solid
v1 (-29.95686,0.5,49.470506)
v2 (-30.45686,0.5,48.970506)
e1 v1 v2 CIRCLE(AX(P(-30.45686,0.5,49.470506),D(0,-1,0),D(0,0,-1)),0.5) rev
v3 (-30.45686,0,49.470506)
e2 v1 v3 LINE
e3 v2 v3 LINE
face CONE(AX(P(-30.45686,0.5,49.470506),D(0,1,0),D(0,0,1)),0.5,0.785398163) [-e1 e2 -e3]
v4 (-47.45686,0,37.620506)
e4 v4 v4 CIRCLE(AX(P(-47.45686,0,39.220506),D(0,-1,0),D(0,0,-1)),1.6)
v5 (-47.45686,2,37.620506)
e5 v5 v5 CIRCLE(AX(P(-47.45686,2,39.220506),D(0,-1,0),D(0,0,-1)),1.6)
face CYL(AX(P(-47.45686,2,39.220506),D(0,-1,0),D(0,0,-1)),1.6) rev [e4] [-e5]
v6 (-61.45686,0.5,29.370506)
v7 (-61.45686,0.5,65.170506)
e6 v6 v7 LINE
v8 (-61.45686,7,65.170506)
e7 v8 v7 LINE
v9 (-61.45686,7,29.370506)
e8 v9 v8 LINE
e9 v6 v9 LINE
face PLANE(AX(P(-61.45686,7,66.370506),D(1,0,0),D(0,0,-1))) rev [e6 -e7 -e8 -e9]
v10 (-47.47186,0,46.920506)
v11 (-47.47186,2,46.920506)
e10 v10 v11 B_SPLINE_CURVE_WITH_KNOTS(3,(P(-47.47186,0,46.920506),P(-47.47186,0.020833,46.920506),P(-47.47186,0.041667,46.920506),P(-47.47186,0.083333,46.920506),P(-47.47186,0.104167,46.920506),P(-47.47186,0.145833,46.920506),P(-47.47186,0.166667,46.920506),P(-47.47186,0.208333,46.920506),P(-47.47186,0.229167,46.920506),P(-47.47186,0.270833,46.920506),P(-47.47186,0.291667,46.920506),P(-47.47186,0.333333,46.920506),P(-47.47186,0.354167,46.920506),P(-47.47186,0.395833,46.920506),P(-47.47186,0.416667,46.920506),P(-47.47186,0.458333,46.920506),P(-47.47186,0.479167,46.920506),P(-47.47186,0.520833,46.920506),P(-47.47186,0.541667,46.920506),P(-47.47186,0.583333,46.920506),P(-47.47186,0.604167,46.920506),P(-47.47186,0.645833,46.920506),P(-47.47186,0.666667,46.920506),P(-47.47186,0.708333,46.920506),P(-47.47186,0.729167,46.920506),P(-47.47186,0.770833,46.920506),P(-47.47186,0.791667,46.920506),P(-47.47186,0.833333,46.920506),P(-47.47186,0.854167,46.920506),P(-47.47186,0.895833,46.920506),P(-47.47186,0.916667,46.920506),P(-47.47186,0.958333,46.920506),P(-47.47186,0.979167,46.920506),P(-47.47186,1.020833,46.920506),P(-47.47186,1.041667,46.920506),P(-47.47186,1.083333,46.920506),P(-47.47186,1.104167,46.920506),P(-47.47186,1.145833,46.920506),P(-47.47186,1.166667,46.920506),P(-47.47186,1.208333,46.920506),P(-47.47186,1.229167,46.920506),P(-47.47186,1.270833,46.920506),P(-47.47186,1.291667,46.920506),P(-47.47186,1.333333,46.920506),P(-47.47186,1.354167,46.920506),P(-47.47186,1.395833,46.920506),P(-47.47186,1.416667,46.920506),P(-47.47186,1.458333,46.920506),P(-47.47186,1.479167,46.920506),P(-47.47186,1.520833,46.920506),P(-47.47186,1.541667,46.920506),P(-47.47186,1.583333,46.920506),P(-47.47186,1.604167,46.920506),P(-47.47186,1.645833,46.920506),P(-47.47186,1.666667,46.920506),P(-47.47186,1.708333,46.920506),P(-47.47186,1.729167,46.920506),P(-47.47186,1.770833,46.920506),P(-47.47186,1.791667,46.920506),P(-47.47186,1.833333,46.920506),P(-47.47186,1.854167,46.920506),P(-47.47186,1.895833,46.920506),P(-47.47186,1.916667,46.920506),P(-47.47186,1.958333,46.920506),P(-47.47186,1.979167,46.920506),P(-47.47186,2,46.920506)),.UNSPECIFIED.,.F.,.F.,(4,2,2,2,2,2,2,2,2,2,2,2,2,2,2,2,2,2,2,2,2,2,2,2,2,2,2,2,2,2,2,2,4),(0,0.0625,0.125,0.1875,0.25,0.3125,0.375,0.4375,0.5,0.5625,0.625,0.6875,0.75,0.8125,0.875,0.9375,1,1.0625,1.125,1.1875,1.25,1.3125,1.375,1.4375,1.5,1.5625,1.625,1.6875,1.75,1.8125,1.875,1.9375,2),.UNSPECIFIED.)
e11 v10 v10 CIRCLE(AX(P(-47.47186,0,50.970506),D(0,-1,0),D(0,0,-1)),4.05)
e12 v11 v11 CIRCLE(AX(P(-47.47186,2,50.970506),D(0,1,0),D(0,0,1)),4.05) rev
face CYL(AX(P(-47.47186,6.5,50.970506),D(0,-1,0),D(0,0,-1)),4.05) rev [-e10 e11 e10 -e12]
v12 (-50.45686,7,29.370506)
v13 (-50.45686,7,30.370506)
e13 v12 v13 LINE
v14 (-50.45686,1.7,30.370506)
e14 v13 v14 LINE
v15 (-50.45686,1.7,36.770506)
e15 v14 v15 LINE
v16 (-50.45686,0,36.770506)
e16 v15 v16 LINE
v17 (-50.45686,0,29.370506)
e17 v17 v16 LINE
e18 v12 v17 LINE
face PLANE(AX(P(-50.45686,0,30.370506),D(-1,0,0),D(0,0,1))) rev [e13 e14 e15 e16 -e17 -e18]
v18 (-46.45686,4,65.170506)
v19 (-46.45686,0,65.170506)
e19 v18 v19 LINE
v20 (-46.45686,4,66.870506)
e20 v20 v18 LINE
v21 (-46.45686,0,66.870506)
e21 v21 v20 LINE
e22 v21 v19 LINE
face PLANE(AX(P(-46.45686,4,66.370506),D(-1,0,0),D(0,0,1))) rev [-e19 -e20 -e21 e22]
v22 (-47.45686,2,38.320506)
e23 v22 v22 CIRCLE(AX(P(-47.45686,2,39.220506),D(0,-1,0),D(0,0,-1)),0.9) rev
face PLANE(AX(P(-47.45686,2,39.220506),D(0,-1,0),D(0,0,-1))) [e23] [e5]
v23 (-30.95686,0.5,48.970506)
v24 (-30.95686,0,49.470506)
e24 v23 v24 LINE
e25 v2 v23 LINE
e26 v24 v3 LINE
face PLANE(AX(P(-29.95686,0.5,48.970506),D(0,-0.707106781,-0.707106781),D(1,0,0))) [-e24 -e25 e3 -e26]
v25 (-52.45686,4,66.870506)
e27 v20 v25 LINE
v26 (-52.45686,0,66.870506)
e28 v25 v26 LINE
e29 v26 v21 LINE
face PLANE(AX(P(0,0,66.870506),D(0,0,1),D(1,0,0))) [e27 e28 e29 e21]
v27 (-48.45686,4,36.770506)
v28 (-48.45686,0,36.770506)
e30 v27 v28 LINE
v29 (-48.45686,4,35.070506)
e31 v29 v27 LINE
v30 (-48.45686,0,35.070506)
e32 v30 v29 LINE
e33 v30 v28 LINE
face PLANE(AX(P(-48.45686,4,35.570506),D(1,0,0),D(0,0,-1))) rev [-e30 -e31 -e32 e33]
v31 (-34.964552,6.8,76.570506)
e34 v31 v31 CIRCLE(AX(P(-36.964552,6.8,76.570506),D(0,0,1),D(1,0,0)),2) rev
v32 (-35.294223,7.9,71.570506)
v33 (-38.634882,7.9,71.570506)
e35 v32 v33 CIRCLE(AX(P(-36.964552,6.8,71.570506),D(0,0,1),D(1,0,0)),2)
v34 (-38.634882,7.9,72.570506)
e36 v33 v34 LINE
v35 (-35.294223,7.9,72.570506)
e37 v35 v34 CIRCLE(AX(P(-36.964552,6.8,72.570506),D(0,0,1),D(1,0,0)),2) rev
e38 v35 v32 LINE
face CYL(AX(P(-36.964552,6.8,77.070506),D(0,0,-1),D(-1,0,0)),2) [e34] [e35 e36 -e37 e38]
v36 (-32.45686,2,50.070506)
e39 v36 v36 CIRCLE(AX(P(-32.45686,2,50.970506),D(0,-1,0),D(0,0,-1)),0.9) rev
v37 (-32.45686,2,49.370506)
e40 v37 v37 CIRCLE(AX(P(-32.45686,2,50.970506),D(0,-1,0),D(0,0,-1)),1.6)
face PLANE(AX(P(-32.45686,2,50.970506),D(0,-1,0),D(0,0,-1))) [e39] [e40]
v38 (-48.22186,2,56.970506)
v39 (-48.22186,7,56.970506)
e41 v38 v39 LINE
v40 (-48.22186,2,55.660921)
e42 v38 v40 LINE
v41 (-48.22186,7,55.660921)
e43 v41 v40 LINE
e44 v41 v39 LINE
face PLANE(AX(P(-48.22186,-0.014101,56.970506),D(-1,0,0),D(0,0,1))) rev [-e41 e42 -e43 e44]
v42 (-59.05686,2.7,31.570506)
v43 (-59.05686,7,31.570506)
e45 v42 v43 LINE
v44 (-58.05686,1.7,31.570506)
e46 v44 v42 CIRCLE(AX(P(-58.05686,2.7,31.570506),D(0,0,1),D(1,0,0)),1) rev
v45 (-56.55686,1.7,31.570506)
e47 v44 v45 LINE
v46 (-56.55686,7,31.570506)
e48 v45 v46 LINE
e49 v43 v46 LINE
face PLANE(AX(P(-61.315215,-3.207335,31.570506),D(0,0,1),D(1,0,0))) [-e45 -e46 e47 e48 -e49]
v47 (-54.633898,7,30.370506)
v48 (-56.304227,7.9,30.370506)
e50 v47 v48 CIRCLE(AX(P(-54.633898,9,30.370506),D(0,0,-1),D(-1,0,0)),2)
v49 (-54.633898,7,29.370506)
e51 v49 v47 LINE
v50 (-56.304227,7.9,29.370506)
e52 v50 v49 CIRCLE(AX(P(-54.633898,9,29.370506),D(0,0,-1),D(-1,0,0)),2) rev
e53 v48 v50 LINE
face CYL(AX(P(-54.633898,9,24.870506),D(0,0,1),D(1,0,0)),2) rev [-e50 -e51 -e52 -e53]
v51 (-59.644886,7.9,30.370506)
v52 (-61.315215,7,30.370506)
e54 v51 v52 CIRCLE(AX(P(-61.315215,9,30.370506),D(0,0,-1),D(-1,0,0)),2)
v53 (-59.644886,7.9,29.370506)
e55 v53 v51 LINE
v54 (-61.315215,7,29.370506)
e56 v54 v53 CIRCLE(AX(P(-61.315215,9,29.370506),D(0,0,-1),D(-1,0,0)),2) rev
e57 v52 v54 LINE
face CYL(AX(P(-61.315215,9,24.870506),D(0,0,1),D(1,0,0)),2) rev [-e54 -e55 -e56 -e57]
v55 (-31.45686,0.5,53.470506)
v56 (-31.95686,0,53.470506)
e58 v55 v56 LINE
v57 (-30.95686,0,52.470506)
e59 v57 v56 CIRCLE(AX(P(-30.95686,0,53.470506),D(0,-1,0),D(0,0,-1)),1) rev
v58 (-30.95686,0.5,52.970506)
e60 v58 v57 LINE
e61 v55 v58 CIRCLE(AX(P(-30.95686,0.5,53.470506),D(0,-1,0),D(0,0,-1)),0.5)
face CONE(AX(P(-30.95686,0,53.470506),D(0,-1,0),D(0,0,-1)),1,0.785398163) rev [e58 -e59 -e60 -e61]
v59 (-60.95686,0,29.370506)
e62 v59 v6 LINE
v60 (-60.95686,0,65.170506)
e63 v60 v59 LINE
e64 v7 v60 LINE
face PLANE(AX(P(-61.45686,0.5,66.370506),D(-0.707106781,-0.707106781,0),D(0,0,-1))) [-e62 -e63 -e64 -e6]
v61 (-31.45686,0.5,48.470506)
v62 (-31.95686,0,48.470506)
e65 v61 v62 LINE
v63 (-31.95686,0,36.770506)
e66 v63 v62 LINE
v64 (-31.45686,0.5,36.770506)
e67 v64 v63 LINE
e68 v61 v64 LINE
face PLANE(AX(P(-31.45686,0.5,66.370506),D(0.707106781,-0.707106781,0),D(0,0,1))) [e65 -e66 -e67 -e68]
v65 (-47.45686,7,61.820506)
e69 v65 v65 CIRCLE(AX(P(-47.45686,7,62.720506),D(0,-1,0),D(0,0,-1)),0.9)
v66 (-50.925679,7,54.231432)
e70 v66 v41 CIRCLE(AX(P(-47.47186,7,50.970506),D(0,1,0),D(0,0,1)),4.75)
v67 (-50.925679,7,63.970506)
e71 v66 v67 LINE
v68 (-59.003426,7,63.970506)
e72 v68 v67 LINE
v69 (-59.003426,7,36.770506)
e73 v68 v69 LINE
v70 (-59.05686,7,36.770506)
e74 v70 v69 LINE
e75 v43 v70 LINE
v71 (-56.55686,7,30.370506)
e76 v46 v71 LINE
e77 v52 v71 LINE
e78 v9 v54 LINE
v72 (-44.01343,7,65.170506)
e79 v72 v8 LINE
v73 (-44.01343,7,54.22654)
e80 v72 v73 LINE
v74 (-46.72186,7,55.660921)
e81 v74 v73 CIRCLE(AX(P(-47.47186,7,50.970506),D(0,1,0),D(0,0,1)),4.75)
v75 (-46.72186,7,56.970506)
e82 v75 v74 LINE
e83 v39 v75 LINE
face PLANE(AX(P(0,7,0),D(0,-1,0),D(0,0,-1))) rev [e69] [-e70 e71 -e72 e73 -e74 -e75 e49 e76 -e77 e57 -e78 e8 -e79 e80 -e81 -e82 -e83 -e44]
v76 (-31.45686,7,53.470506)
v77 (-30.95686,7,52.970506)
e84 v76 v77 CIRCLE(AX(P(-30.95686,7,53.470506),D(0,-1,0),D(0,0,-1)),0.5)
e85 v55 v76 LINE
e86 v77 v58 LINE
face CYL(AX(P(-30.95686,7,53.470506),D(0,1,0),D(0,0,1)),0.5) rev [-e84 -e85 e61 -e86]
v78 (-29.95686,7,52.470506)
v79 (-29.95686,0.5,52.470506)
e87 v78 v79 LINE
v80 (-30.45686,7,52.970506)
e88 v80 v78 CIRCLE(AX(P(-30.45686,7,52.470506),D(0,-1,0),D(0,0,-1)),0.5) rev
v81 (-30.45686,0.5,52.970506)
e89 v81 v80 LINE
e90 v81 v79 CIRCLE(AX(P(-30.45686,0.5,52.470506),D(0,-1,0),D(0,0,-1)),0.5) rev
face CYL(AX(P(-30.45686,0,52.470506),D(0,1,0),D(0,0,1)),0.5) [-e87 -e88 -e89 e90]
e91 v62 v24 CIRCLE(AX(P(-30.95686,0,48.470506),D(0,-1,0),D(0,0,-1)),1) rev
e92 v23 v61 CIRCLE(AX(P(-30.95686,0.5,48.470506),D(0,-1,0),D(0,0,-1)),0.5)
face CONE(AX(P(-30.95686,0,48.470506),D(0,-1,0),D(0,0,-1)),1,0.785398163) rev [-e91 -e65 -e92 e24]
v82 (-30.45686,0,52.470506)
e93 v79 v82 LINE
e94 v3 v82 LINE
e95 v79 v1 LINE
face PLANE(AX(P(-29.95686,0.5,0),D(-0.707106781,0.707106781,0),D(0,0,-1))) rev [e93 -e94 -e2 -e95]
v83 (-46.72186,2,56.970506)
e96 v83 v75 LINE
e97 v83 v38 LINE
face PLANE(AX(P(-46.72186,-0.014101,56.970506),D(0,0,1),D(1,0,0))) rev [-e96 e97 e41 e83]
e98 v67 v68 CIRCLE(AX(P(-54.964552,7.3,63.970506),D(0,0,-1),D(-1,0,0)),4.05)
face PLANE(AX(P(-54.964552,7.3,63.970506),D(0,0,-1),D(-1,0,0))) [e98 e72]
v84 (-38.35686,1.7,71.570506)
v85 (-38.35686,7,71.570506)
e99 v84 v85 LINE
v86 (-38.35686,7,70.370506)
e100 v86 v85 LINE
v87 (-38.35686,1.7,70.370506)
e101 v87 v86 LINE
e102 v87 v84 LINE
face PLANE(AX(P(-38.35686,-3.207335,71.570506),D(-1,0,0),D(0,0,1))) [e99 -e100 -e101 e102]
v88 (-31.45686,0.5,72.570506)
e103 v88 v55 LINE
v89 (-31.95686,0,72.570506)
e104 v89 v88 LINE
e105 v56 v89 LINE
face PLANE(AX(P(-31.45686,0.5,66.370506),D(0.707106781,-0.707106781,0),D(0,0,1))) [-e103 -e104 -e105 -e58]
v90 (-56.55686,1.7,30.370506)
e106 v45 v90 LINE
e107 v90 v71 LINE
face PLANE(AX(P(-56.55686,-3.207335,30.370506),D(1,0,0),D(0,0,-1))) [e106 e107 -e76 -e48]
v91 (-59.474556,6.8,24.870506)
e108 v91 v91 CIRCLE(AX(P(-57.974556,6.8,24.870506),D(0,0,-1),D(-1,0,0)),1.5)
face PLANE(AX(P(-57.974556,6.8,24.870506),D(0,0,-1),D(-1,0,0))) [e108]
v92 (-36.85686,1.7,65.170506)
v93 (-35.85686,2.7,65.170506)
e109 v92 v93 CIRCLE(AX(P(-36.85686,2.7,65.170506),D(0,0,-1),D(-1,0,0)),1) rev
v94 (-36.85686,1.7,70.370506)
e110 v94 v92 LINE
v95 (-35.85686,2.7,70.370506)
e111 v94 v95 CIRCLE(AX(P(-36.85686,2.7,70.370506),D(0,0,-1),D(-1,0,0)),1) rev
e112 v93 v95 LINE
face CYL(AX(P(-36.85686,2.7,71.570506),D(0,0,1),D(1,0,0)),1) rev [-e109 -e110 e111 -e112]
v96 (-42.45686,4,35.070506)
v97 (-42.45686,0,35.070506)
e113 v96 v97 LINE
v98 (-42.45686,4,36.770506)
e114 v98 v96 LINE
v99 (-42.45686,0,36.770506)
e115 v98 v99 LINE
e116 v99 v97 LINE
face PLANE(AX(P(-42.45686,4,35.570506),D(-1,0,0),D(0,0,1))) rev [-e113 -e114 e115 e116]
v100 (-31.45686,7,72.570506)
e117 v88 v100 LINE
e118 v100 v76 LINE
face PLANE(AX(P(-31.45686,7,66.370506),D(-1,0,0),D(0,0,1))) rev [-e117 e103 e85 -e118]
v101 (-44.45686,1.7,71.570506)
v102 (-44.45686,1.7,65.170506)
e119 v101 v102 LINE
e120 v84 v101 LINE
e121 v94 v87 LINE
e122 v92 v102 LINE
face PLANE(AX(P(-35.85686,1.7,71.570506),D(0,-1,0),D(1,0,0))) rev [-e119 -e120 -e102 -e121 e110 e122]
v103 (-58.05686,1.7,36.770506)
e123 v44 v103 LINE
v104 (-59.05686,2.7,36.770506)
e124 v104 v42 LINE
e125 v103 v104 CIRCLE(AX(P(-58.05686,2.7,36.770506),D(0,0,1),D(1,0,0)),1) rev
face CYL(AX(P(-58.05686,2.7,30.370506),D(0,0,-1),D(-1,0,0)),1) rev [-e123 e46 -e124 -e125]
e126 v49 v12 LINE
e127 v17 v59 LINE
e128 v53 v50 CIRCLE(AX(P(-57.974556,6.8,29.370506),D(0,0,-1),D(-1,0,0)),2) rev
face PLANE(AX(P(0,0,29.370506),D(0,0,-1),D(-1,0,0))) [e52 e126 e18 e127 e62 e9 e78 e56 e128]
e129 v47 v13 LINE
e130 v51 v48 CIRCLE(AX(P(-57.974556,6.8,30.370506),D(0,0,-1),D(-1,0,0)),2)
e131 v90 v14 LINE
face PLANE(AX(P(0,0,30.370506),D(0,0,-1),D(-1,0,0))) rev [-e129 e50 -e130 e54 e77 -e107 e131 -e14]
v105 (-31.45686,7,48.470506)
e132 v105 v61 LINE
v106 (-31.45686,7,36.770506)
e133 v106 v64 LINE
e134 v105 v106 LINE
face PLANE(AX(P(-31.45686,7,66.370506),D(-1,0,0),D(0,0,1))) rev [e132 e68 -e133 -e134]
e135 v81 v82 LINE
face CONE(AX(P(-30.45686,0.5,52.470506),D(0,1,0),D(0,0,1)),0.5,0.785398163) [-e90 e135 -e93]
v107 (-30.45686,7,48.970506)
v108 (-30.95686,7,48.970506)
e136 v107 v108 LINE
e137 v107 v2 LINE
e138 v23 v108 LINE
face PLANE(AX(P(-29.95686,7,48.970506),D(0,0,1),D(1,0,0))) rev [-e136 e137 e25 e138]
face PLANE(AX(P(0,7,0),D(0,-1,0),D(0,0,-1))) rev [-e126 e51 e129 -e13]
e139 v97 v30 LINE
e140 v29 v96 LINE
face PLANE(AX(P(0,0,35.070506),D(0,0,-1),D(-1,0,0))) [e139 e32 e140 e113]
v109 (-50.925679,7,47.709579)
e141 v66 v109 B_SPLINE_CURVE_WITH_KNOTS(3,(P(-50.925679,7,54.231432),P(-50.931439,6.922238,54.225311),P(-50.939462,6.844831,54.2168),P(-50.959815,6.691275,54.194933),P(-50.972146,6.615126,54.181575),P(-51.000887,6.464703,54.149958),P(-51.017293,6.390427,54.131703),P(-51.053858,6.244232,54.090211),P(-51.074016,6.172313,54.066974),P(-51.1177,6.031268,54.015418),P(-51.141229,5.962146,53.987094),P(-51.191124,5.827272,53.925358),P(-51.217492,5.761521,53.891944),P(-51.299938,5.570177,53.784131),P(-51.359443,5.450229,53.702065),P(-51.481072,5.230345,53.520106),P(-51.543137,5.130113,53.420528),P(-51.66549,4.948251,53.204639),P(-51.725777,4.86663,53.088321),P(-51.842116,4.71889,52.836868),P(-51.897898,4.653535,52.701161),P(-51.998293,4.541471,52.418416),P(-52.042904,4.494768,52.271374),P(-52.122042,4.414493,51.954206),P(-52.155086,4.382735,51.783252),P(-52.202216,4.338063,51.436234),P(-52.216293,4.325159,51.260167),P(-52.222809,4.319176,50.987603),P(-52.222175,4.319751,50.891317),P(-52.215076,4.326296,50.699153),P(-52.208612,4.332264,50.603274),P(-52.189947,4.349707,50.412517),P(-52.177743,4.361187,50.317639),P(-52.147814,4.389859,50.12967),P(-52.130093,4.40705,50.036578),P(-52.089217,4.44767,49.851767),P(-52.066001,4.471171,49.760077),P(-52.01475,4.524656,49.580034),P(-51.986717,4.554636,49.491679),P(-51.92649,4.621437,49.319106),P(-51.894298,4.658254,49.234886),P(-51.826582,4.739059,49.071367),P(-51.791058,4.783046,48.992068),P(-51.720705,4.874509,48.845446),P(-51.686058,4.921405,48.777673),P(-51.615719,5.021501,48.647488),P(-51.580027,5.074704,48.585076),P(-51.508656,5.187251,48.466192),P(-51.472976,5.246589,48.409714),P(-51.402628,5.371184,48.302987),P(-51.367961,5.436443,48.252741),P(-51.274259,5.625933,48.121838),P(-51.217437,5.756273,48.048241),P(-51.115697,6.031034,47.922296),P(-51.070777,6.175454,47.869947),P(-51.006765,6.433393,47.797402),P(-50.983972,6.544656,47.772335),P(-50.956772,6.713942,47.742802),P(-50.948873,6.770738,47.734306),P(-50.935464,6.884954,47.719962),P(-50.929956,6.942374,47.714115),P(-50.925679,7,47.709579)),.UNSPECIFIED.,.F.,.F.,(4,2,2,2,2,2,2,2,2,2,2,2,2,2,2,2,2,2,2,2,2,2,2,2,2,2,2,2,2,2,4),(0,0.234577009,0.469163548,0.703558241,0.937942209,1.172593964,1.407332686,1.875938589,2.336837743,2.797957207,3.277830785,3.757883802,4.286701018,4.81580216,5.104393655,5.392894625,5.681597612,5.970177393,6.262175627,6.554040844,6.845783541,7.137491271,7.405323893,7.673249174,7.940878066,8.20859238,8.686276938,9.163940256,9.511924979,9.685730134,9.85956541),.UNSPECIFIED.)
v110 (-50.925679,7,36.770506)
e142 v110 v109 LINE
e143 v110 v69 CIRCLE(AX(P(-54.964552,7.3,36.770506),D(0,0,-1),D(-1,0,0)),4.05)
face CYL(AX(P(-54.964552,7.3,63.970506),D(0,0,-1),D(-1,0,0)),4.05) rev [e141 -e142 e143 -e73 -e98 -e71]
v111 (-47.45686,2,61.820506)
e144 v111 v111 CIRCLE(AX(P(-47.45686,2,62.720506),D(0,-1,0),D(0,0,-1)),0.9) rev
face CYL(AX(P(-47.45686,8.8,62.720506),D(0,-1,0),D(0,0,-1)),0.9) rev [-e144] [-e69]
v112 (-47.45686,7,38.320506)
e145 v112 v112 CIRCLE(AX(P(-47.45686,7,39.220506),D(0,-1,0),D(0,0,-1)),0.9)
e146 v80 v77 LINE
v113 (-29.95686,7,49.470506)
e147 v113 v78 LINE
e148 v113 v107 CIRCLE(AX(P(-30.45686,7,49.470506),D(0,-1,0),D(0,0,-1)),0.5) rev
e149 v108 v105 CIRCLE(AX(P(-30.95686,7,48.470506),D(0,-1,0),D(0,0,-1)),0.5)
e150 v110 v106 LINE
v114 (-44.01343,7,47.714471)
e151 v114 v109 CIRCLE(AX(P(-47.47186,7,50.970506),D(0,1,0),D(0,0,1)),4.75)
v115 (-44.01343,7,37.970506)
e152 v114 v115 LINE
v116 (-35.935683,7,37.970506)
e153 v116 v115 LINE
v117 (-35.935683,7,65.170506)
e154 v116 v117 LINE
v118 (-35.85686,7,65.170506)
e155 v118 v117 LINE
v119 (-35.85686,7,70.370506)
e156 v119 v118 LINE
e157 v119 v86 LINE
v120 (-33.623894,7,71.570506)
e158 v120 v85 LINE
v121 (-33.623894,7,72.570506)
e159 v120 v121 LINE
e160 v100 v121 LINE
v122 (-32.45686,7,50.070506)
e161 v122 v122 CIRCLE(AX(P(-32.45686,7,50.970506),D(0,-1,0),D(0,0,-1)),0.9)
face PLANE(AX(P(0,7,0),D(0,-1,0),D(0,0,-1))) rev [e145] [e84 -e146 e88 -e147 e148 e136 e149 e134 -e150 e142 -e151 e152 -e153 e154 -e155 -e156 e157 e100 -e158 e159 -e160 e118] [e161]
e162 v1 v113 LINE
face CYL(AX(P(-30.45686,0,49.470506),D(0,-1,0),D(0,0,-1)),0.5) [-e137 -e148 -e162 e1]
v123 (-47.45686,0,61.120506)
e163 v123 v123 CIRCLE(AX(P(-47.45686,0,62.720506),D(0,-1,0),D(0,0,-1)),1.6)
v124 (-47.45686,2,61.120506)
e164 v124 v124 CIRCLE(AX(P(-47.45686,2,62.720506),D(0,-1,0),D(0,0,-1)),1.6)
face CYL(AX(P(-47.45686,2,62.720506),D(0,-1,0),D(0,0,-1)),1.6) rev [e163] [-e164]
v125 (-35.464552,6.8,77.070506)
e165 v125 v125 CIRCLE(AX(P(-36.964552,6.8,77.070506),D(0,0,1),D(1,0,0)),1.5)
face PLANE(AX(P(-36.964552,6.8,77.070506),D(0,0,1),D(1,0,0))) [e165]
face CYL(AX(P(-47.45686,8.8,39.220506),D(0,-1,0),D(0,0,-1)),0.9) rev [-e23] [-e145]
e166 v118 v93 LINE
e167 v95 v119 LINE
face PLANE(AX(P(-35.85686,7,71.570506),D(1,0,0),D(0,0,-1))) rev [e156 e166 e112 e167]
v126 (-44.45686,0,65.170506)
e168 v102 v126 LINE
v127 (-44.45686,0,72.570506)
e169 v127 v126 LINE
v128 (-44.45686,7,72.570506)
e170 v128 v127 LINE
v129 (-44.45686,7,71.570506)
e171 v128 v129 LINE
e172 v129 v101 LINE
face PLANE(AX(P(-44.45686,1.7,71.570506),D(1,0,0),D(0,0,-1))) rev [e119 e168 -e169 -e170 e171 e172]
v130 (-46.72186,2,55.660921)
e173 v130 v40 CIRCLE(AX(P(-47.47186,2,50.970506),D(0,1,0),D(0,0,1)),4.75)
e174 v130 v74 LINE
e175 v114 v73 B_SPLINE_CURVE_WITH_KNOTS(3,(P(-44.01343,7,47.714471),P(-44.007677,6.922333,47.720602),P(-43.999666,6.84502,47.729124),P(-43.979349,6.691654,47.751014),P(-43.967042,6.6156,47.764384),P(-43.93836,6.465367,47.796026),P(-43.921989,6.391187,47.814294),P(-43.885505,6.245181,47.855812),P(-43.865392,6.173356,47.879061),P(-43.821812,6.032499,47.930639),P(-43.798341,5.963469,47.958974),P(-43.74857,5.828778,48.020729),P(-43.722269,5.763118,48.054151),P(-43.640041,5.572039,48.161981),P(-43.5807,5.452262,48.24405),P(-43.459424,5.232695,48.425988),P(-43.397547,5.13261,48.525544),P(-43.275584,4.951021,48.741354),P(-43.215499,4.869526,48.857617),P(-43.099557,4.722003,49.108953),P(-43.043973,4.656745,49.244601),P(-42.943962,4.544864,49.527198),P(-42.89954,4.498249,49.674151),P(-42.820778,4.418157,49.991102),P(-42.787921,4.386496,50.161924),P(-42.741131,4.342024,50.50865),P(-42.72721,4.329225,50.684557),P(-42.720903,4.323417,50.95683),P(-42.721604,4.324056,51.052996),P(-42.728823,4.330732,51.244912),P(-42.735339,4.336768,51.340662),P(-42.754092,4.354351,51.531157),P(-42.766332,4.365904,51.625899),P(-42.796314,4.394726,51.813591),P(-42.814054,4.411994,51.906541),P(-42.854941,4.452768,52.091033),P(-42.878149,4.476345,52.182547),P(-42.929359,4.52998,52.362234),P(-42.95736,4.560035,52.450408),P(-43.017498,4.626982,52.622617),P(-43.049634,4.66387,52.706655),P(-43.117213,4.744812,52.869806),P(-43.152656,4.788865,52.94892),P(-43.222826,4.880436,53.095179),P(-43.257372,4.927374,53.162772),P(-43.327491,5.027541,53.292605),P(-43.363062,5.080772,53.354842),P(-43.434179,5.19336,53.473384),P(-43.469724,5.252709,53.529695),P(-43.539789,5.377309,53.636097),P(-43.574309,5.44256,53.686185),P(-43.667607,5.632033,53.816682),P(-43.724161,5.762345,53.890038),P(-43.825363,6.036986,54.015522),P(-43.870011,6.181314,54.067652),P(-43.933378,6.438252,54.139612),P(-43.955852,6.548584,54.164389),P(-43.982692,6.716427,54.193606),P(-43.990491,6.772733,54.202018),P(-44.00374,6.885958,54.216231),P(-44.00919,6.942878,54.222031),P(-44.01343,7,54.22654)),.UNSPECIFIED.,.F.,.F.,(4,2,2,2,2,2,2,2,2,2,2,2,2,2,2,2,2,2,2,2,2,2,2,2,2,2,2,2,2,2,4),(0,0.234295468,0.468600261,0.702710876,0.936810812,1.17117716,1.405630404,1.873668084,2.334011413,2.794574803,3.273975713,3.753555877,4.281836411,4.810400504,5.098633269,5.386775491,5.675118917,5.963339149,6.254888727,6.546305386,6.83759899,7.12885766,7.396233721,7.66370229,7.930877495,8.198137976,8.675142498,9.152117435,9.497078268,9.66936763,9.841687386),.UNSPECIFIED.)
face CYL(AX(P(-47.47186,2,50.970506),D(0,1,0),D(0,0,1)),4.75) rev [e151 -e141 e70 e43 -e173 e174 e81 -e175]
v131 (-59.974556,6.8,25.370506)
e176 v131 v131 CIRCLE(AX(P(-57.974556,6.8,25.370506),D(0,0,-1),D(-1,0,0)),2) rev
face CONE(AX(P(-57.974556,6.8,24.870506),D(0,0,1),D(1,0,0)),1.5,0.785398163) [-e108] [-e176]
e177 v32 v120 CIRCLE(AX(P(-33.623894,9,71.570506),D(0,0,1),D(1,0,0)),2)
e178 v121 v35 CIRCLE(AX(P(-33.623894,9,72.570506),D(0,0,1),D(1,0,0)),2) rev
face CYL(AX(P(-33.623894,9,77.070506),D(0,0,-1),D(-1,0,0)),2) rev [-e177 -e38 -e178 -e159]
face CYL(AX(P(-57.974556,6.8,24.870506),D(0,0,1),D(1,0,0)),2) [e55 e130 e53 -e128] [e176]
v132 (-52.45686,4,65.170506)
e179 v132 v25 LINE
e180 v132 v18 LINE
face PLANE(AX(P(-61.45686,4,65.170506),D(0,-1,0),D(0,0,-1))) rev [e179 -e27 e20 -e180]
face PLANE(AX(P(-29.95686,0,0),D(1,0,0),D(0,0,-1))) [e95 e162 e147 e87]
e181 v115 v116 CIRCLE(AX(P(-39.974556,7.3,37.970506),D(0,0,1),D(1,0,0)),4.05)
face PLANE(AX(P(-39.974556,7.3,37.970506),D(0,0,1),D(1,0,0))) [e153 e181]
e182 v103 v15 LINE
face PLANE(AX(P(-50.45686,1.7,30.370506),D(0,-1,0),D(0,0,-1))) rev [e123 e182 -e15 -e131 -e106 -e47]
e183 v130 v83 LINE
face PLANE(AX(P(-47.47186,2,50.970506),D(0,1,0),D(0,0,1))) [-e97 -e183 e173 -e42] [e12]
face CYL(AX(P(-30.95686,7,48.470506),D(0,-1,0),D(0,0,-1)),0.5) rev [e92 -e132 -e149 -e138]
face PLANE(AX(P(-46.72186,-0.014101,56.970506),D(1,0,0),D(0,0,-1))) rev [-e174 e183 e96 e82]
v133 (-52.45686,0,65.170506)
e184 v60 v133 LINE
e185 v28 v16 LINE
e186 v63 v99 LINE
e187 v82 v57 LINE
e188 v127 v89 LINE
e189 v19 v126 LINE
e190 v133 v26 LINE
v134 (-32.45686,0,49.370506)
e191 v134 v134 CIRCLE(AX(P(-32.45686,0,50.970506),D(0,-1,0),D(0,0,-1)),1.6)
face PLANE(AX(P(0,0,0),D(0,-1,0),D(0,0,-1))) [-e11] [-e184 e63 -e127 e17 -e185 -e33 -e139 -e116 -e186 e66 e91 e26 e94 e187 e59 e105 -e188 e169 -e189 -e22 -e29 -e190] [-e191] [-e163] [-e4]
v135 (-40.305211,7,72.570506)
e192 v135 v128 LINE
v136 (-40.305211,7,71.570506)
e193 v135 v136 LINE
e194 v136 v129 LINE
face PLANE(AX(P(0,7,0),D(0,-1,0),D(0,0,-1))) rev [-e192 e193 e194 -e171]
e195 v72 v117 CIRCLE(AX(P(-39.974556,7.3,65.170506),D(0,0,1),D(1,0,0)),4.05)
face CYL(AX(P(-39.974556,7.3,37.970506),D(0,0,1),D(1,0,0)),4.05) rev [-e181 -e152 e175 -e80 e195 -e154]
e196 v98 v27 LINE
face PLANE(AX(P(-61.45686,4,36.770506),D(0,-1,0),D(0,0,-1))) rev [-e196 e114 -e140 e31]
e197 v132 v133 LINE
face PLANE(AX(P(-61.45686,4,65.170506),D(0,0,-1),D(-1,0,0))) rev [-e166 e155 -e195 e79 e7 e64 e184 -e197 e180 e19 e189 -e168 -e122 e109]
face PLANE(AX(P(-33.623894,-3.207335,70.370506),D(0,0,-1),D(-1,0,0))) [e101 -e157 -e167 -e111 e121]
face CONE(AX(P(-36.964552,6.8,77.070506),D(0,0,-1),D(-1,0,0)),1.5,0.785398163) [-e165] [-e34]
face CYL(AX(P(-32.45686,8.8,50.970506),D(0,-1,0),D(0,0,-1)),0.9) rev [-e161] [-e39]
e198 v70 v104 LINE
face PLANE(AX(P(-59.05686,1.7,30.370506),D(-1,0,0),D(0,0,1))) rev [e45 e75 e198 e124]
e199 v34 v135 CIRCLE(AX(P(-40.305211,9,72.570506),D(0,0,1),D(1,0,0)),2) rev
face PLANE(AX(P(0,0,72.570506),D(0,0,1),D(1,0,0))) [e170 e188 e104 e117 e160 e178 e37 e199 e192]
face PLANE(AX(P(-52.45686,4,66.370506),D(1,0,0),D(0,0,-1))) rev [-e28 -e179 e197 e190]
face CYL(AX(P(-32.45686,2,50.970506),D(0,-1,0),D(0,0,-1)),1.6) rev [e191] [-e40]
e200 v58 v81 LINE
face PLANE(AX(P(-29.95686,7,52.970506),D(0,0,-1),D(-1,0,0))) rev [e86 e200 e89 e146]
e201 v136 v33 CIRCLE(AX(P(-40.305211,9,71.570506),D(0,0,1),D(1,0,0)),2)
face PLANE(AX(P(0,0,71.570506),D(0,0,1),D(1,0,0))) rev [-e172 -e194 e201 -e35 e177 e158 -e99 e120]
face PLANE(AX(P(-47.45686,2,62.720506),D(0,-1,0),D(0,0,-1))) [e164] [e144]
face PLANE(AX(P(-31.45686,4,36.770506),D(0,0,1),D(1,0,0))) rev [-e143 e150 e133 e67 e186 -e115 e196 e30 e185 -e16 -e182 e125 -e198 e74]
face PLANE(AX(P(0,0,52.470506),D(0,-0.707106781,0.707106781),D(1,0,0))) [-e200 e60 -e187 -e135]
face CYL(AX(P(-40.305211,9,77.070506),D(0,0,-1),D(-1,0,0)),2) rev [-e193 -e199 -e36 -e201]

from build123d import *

# Parameters (mm, degrees)
SKETCH1_W            = 30
SKETCH1_H            = 30.8
BOSS_EXTRUDE1_DEPTH  = 7
SKETCH2_R            = 4.05
CUT_EXTRUDE1_DEPTH   = 6.5
SKETCH3_W            = 15
SKETCH3_H            = 1.2
SKETCH3_W_2          = 9
SKETCH3_W_3          = 11
SKETCH3_W_4          = 13
CUT_EXTRUDE2_DEPTH   = 4
SKETCH4_W            = 30
SKETCH4_H            = 3
CUT_EXTRUDE3_DEPTH   = 1.2
SKETCH5_W            = 30
SKETCH5_H            = 3
CUT_EXTRUDE4_DEPTH   = 1.2
SKETCH6_R            = 4.05
CUT_EXTRUDE5_DEPTH   = 27.2
SKETCH7_R            = 4.05
CUT_EXTRUDE6_DEPTH   = 27.2
SKETCH8_R            = 4.75
CUT_EXTRUDE7_DEPTH   = 5
BOSS_EXTRUDE2_DEPTH  = 6.4
FILLET1_R            = 1
BOSS_EXTRUDE3_DEPTH  = 6.4
FILLET2_R            = 1
SKETCH12_W           = 1.5
SKETCH12_H           = 1.344099237
CUT_EXTRUDE8_DEPTH   = 5
SKETCH13_W           = 13
SKETCH13_H           = 7
BOSS_EXTRUDE4_DEPTH  = 1
SKETCH14_W           = 11
SKETCH14_H           = 7
BOSS_EXTRUDE5_DEPTH  = 1
SKETCH15_R           = 2
BOSS_EXTRUDE8_DEPTH  = 5.5
SKETCH16_R           = 2
BOSS_EXTRUDE9_DEPTH  = 5.5
FILLET3_R            = 2
FILLET4_R            = 2
FILLET5_R            = 2
CHAMFER2_SIZE        = 0.5
CHAMFER3_SIZE        = 0.5
SKETCH17_W           = 4
SKETCH17_H           = 7
BOSS_EXTRUDE10_DEPTH = 1.5
FILLET7_R            = 0.5
SKETCH18_R           = 0.9
CUT_EXTRUDE9_DEPTH   = 99.965895754
SKETCH19_R           = 1.6
CUT_EXTRUDE10_DEPTH  = 2
SKETCH20_R           = 0.9
CUT_EXTRUDE11_DEPTH  = 99.965895754
SKETCH21_R           = 1.6
CUT_EXTRUDE12_DEPTH  = 2
CHAMFER6_SIZE        = 0.5
SKETCH22_W           = 6
SKETCH22_H           = 4
BOSS_EXTRUDE11_DEPTH = 0.5
SKETCH23_W           = 6
SKETCH23_H           = 4
BOSS_EXTRUDE12_DEPTH = 0.5
BOSS_EXTRUDE13_REACH = 100.822
SKETCH24_W           = 4.732966807
SKETCH24_H           = 1.2
SKETCH24_W_2         = 4.75835454


# Some blends are built 0.0001 mm under size
with BuildPart() as part:
    # Sketch1 → Boss-Extrude1 (new body)
    with BuildSketch(Plane(origin=(0, 0, 0), x_dir=(1, 0, 0), z_dir=(0, 1, 0))):
        with Locations((-46.45686042, -50.970505576)):
            Rectangle(SKETCH1_W, SKETCH1_H)
    extrude(amount=BOSS_EXTRUDE1_DEPTH)

    # Sketch2 → Cut-Extrude1 (cut)
    with BuildSketch(Plane.XZ):
        with Locations(Location((-47.47186042, 50.970505576, 0), (0, 0, 270))):
            Circle(SKETCH2_R)
    extrude(amount=-CUT_EXTRUDE1_DEPTH, mode=Mode.SUBTRACT)

    # Sketch3 → Cut-Extrude2 (cut)
    with BuildSketch(Plane.XZ):
        with Locations((-38.95686042, 65.770505576)):
            Rectangle(SKETCH3_W, SKETCH3_H)
        with Locations((-56.95686042, 65.770505576)):
            Rectangle(SKETCH3_W_2, SKETCH3_H)
        with Locations((-36.95686042, 36.170505576)):
            Rectangle(SKETCH3_W_3, SKETCH3_H)
        with Locations((-54.95686042, 36.170505576)):
            Rectangle(SKETCH3_W_4, SKETCH3_H)
    extrude(amount=-CUT_EXTRUDE2_DEPTH, mode=Mode.SUBTRACT)

    # Sketch4 → Cut-Extrude3 (cut)
    with BuildSketch(Plane.XY.offset(66.370505576)):
        with Locations((-46.45686042, 5.5)):
            Rectangle(SKETCH4_W, SKETCH4_H)
    extrude(amount=-CUT_EXTRUDE3_DEPTH, mode=Mode.SUBTRACT)

    # Sketch5 → Cut-Extrude4 (cut)
    with BuildSketch(Plane(origin=(0, 0, 35.570505576), x_dir=(-1, 0, 0), z_dir=(0, 0, -1))):
        with Locations((46.45686042, 5.5)):
            Rectangle(SKETCH5_W, SKETCH5_H)
    extrude(amount=-CUT_EXTRUDE4_DEPTH, mode=Mode.SUBTRACT)

    # Sketch6 → Cut-Extrude5 (cut)
    with BuildSketch(Plane.XY.offset(65.170505576)):
        with Locations((-39.974556342, 7.3)):
            Circle(SKETCH6_R)
    extrude(amount=-CUT_EXTRUDE5_DEPTH, mode=Mode.SUBTRACT)

    # Sketch7 → Cut-Extrude6 (cut)
    with BuildSketch(Plane(origin=(0, 0, 36.770505576), x_dir=(-1, 0, 0), z_dir=(0, 0, -1))):
        with Locations((54.96455223, 7.3)):
            Circle(SKETCH7_R)
    extrude(amount=-CUT_EXTRUDE6_DEPTH, mode=Mode.SUBTRACT)

    # Sketch8 → Cut-Extrude7 (cut)
    with BuildSketch(Plane(origin=(0, 7, 0), x_dir=(1, 0, 0), z_dir=(0, 1, 0))):
        with Locations(Location((-47.47186042, -50.970505576, 0), (0, 0, 270))):
            Circle(SKETCH8_R)
    extrude(amount=-CUT_EXTRUDE7_DEPTH, mode=Mode.SUBTRACT)

    # Sketch10 → Boss-Extrude2 (add)
    with BuildSketch(Plane.XY.offset(65.170505576)):
        Polygon((-31.45686042, 0), (-31.45686042, 7), (-35.85686042, 7), (-35.85686042, 1.7), (-44.45686042, 1.7), (-44.45686042, 0), align=None)
    extrude(amount=BOSS_EXTRUDE2_DEPTH)

    # Fillet1
    fillet1_edges = [part.edges().sort_by_distance(p)[0] for p in [
        (-35.85686042, 1.7, 68.370505576),
    ]]
    fillet(fillet1_edges, radius=FILLET1_R)

    # Sketch11 → Boss-Extrude3 (add)
    with BuildSketch(Plane(origin=(0, 0, 36.770505576), x_dir=(-1, 0, 0), z_dir=(0, 0, -1))):
        Polygon((61.45686042, 7), (61.45686042, 0), (50.45686042, 0), (50.45686042, 1.7), (59.05686042, 1.7), (59.05686042, 7), align=None)
    extrude(amount=BOSS_EXTRUDE3_DEPTH)

    # Fillet2
    fillet2_edges = [part.edges().sort_by_distance(p)[0] for p in [
        (-59.05686042, 1.7, 33.570505576),
    ]]
    fillet(fillet2_edges, radius=FILLET2_R)

    # Sketch12 → Cut-Extrude8 (cut)
    with BuildSketch(Plane(origin=(0, 7, 0), x_dir=(1, 0, 0), z_dir=(0, 1, 0))):
        with Locations((-47.47186042, -56.298455958)):
            Rectangle(SKETCH12_W, SKETCH12_H)
    extrude(amount=-CUT_EXTRUDE8_DEPTH, mode=Mode.SUBTRACT)

    # Sketch13 → Boss-Extrude4 (add)
    with BuildSketch(Plane.XY.offset(71.570505576)):
        with Locations((-37.95686042, 3.5)):
            Rectangle(SKETCH13_W, SKETCH13_H)
    extrude(amount=BOSS_EXTRUDE4_DEPTH)

    # Sketch14 → Boss-Extrude5 (add)
    with BuildSketch(Plane(origin=(0, 0, 30.370505576), x_dir=(-1, 0, 0), z_dir=(0, 0, -1))):
        with Locations((55.95686042, 3.5)):
            Rectangle(SKETCH14_W, SKETCH14_H)
    extrude(amount=BOSS_EXTRUDE5_DEPTH)

    # Sketch15 → Boss-Extrude8 (add)
    with BuildSketch(Plane.XY.offset(71.570505576)):
        with Locations(Location((-36.96455223, 6.8, 0), (0, 0, 174.260829523))):
            Circle(SKETCH15_R)
    extrude(amount=BOSS_EXTRUDE8_DEPTH)

    # Sketch16 → Boss-Extrude9 (add)
    with BuildSketch(Plane(origin=(0, 0, 30.370505576), x_dir=(-1, 0, 0), z_dir=(0, 0, -1))):
        with Locations(Location((57.974556342, 6.8, 0), (0, 0, 174.260829523))):
            Circle(SKETCH16_R)
    extrude(amount=BOSS_EXTRUDE9_DEPTH)

    # Fillet3
    fillet3_edges = [part.edges().sort_by_distance(p)[0] for p in [
        (-59.964531217, 7, 29.870505576),
    ]]
    fillet(fillet3_edges, radius=FILLET3_R)

    # Fillet4
    # the kernel refuses this fillet: 2 mm, written as the material it adds along each edge
    with BuildSketch(Plane(origin=(-55.984581468, 7, 30.370505576), x_dir=(1.0, 7.52728269616064e-12, 0), z_dir=(0, 0, -1))) as fillet4_piece_1:
        with BuildLine():
            CenterArc((1.350683743, -2), FILLET4_R, 90, 56.632987031)
            ThreePointArc((-0.319645565, -0.9), (-0.105311329, -0.469360383), (0, 0))
            Line((0, 0), (1.350683743, 0))
        make_face()
    extrude(amount=1)

    # Fillet5
    # the kernel refuses this fillet: 2 mm, written as the material it adds along each edge
    with BuildSketch(Plane(origin=(-38.954527104, 7, 71.570505576), x_dir=(-1.0, 7.116297137925098e-12, 0), z_dir=(0, 0, 1)), Plane(origin=(-34.974577356, 7, 72.570505576), x_dir=(1, 0, 0), z_dir=(0, 0, -1))) as fillet5_piece_1:
        with BuildLine():
            CenterArc((1.350683743, -2), FILLET5_R, 90, 56.632987031)
            ThreePointArc((-0.319645565, -0.9), (-0.105311329, -0.469360383), (0, 0))
            Line((0, 0), (1.350683743, 0))
        make_face()
    extrude(amount=1)

    # Chamfer2
    chamfer2_edges = [part.edges().sort_by_distance(p)[0] for p in [
        (-34.974577356, 6.6, 77.070505576),
    ]]
    chamfer(chamfer2_edges, length=CHAMFER2_SIZE)

    # Chamfer3
    chamfer3_edges = [part.edges().sort_by_distance(p)[0] for p in [
        (-59.964531217, 6.6, 24.870505576),
    ]]
    chamfer(chamfer3_edges, length=CHAMFER3_SIZE)

    # Sketch17 → Boss-Extrude10 (add)
    with BuildSketch(Plane(origin=(-31.45686042, 0, 0), x_dir=(0, 0, -1), z_dir=(1, 0, 0))):
        with Locations((-50.970505576, 3.5)):
            Rectangle(SKETCH17_W, SKETCH17_H)
    extrude(amount=BOSS_EXTRUDE10_DEPTH)

    # Fillet7
    fillet7_edges = [part.edges().sort_by_distance(p)[0] for p in [
        (-31.45686042, 3.5, 52.970505576),
        (-31.45686042, 3.5, 48.970505576),
        (-29.95686042, 3.5, 52.970505576),
        (-29.95686042, 3.5, 48.970505576),
    ]]
    fillet(fillet7_edges, radius=FILLET7_R)

    # Sketch18 → Cut-Extrude9 (cut, through all)
    with BuildSketch(Plane.XZ):
        with Locations(Location((-32.45686042, 50.970505576, 0), (0, 0, 270))):
            Circle(SKETCH18_R)
    extrude(amount=-CUT_EXTRUDE9_DEPTH, mode=Mode.SUBTRACT)

    # Sketch19 → Cut-Extrude10 (cut)
    with BuildSketch(Plane.XZ):
        with Locations(Location((-32.45686042, 50.970505576, 0), (0, 0, 270))):
            Circle(SKETCH19_R)
    extrude(amount=-CUT_EXTRUDE10_DEPTH, mode=Mode.SUBTRACT)

    # Sketch20 → Cut-Extrude11 (cut, through all)
    with BuildSketch(Plane.XZ):
        with Locations(Location((-47.45686042, 62.720505576, 0), (0, 0, 270))):
            Circle(SKETCH20_R)
        with Locations(Location((-47.45686042, 39.220505576, 0), (0, 0, 270))):
            Circle(SKETCH20_R)
    extrude(amount=-CUT_EXTRUDE11_DEPTH, mode=Mode.SUBTRACT)

    # Sketch21 → Cut-Extrude12 (cut)
    with BuildSketch(Plane.XZ):
        with Locations(Location((-47.45686042, 62.720505576, 0), (0, 0, 270))):
            Circle(SKETCH21_R)
        with Locations(Location((-47.45686042, 39.220505576, 0), (0, 0, 270))):
            Circle(SKETCH21_R)
    extrude(amount=-CUT_EXTRUDE12_DEPTH, mode=Mode.SUBTRACT)

    # Chamfer6
    chamfer6_edges = [part.edges().sort_by_distance(p)[0] for p in [
        (-61.45686042, 0, 47.270505576),
        (-31.45686042, 0, 63.020505576),
        (-30.70686042, 0, 52.970505576),
        (-29.95686042, 0, 50.970505576),
        (-31.45686042, 0, 42.620505576),
        (-30.70686042, 0, 48.970505576),
        (-30.103307029, 0, 49.116952185),
        (-30.103307029, 0, 52.824058967),
        (-31.310413811, 0, 53.116952185),
        (-31.310413811, 0, 48.824058967),
    ]]
    chamfer(chamfer6_edges, length=CHAMFER6_SIZE - 0.0001)  # a hair under: the kernel refuses the full size

    # Sketch22 → Boss-Extrude11 (add)
    with BuildSketch(Plane(origin=(0, 0, 35.570505576), x_dir=(-1, 0, 0), z_dir=(0, 0, -1))):
        with Locations((45.45686042, 2)):
            Rectangle(SKETCH22_W, SKETCH22_H)
    extrude(amount=BOSS_EXTRUDE11_DEPTH)

    # Sketch23 → Boss-Extrude12 (add)
    with BuildSketch(Plane.XY.offset(66.370505576)):
        with Locations((-49.45686042, 2)):
            Rectangle(SKETCH23_W, SKETCH23_H)
    extrude(amount=BOSS_EXTRUDE12_DEPTH)

    # Boss-Extrude13: up to this face of the body (flat: up to its plane)
    boss_extrude13_end = Plane(part.part.faces().sort_by_distance((-54.25686042, 1.7, 33.570505576))[0])
    # Sketch24 → Boss-Extrude13 (add, up to the picked face)
    with BuildSketch(Plane(origin=(0, 7, 0), x_dir=(1, 0, 0), z_dir=(0, 1, 0)), mode=Mode.PRIVATE) as boss_extrude13_sk1:
        with Locations((-35.990377017, -70.970505576)):
            Rectangle(SKETCH24_W, SKETCH24_H)
    boss_extrude13_tool1 = split(extrude(boss_extrude13_sk1.sketch, amount=-BOSS_EXTRUDE13_REACH, mode=Mode.PRIVATE), bisect_by=boss_extrude13_end, keep=Keep.BOTH, mode=Mode.PRIVATE)
    # Sketch24 → Boss-Extrude13 (add, up to the picked face)
    with BuildSketch(Plane(origin=(0, 7, 0), x_dir=(1, 0, 0), z_dir=(0, 1, 0)), mode=Mode.PRIVATE) as boss_extrude13_sk2:
        with Locations((-58.93603769, -30.970505576)):
            Rectangle(SKETCH24_W_2, SKETCH24_H)
    boss_extrude13_tool2 = split(extrude(boss_extrude13_sk2.sketch, amount=-BOSS_EXTRUDE13_REACH, mode=Mode.PRIVATE), bisect_by=boss_extrude13_end, keep=Keep.BOTH, mode=Mode.PRIVATE)
    add(boss_extrude13_tool1.solids().sort_by(Axis((-35.990377, 7, 70.970506), (0, -1, 0)))[0])
    add(boss_extrude13_tool2.solids().sort_by(Axis((-58.936038, 7, 30.970506), (0, -1, 0)))[0])


solid = part.part
